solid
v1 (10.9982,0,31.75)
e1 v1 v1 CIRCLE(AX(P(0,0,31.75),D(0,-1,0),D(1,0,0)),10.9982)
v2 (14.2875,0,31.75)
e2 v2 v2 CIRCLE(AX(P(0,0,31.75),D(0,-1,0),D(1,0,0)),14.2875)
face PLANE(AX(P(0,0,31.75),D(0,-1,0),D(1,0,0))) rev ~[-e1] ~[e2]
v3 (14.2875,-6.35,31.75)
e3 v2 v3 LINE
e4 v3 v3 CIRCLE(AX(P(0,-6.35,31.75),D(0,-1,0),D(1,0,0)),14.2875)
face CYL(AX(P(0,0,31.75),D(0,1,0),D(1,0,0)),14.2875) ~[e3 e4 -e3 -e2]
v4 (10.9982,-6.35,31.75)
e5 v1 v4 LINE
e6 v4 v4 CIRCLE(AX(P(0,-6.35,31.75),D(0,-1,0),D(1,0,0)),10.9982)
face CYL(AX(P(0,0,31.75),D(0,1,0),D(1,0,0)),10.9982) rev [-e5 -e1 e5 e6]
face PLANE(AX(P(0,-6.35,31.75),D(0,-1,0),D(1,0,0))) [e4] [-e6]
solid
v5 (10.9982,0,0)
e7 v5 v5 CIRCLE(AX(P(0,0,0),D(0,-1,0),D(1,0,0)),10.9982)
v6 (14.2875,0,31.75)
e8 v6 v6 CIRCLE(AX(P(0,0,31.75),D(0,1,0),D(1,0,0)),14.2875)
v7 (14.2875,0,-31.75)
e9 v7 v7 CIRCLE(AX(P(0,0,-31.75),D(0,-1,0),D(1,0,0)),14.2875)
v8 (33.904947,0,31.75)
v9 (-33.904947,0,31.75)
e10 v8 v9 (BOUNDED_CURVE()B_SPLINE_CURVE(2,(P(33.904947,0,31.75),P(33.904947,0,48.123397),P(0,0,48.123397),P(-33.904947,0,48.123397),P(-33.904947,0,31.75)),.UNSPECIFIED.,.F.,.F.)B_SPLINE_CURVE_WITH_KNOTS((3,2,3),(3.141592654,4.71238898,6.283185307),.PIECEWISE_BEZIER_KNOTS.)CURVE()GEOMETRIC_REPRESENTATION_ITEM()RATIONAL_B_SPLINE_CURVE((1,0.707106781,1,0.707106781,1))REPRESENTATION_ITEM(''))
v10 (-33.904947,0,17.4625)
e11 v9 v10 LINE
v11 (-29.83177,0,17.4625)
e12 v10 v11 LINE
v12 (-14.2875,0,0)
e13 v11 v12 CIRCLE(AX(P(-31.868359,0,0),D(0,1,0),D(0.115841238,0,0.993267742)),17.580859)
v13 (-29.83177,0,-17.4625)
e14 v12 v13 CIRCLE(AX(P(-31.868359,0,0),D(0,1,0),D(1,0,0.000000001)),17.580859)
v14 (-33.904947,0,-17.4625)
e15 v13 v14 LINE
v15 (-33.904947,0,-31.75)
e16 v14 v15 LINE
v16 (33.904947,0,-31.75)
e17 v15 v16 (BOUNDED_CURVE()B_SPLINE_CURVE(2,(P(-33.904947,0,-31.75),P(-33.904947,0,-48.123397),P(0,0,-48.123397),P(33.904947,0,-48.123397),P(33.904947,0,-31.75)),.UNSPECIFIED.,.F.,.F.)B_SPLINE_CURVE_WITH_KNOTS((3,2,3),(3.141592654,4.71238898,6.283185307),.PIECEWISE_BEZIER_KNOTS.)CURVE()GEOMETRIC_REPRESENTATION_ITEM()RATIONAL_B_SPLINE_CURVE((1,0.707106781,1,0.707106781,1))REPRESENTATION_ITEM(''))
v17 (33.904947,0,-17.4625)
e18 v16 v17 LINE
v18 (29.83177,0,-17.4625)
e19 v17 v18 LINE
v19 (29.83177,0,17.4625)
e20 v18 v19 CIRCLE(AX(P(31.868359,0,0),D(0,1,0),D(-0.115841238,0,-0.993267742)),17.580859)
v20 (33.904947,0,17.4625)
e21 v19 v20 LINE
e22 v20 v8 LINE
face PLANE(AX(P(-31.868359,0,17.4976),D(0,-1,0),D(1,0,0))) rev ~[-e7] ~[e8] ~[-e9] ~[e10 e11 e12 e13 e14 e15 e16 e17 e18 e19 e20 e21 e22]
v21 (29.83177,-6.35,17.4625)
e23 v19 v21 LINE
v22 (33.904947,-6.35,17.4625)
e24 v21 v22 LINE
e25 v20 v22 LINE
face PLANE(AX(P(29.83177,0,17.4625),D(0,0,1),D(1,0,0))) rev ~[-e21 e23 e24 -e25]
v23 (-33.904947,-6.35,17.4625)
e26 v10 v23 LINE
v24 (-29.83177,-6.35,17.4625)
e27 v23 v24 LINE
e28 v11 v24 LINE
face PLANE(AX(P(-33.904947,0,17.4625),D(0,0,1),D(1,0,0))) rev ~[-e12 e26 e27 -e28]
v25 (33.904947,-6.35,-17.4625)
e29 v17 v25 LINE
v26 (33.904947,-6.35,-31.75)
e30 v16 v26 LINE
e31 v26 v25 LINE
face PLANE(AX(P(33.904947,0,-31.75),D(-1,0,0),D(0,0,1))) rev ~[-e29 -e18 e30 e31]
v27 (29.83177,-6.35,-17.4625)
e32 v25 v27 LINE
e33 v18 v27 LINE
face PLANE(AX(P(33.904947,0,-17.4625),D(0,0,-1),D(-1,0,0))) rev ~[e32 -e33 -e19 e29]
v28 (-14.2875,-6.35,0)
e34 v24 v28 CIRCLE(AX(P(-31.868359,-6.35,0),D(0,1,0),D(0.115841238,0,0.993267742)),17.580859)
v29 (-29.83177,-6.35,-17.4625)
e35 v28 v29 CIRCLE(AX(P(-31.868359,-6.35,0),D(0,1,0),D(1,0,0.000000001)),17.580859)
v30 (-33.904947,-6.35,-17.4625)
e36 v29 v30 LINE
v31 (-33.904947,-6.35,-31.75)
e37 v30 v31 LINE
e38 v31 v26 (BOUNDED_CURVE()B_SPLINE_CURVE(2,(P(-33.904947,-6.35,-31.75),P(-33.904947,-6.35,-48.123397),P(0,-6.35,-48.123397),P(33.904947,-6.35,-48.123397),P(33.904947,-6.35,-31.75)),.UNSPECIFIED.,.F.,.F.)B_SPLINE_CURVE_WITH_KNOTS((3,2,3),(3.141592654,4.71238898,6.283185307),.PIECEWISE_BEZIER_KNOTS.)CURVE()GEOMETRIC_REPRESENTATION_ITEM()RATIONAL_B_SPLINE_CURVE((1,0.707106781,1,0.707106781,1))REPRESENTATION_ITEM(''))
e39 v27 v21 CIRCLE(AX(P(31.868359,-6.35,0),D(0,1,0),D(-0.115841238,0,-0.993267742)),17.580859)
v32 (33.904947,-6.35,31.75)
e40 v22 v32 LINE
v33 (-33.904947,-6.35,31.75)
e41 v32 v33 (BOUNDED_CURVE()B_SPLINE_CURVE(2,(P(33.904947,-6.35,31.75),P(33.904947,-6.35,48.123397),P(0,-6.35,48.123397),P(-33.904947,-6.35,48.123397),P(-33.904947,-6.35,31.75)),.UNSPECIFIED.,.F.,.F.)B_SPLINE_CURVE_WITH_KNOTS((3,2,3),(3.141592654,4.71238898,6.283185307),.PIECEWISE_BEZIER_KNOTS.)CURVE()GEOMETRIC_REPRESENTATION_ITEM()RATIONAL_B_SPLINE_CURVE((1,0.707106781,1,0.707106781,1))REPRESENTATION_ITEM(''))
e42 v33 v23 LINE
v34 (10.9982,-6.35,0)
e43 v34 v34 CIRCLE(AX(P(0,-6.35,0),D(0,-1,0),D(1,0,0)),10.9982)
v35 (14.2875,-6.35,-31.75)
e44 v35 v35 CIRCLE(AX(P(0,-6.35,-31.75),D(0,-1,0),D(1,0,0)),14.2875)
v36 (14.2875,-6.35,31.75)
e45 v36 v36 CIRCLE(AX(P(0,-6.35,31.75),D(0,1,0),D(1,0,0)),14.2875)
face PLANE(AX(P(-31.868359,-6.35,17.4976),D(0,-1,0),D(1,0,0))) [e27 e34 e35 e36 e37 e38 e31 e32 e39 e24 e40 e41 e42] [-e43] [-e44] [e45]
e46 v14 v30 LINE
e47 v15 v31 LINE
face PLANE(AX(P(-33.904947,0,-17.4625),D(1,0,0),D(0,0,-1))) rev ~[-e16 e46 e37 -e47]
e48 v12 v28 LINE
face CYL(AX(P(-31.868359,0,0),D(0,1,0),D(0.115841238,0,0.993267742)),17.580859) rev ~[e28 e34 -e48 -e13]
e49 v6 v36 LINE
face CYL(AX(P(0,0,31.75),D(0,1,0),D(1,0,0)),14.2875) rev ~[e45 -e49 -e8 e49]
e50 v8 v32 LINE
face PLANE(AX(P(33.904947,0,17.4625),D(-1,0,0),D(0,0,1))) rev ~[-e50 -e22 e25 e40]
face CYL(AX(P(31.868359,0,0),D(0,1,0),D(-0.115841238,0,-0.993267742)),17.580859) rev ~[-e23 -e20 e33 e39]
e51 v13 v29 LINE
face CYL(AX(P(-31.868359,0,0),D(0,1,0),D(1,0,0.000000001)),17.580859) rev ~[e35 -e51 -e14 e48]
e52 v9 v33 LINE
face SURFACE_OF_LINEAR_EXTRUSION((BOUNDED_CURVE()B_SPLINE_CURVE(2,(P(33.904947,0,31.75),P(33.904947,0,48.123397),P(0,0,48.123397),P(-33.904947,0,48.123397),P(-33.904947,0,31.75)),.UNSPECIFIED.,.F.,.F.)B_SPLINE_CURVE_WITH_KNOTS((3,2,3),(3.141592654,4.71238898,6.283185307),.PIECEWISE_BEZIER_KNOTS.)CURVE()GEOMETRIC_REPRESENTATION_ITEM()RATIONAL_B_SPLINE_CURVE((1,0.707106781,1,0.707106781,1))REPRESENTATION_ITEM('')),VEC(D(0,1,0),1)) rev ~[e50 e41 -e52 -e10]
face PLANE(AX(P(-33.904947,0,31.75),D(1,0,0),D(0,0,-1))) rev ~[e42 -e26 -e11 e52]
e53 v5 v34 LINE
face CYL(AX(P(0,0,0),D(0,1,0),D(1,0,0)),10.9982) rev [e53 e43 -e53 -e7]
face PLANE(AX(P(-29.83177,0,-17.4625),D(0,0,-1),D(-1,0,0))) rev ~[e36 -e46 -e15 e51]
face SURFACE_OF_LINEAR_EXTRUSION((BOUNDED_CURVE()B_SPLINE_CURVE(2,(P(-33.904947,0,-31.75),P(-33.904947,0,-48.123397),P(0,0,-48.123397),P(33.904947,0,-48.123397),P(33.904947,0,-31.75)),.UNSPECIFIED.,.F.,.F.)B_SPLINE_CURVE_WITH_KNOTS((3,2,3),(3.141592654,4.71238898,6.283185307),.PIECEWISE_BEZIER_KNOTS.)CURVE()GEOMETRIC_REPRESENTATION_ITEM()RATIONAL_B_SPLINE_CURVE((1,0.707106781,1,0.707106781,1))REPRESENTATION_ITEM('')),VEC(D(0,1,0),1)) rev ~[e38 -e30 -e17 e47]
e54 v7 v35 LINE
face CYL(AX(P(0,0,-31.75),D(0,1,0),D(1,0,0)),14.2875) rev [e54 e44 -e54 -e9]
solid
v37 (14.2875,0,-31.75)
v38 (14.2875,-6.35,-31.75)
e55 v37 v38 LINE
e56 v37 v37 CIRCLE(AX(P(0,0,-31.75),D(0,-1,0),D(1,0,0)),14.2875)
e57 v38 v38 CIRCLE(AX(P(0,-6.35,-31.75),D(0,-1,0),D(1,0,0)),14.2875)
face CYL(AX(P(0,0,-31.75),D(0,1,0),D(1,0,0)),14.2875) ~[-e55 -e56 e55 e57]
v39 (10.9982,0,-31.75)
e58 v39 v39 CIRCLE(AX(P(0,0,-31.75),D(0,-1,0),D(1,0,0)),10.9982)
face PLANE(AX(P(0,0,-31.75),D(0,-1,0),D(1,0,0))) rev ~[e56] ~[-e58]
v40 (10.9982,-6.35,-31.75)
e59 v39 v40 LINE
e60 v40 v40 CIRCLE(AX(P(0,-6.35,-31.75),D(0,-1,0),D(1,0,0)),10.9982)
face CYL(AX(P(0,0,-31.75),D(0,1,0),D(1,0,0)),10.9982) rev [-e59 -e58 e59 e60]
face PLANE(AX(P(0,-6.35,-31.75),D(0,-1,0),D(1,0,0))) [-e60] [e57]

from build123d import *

# Parameters (mm, degrees)
F1_R     = 10.9982
F1_R_2   = 14.2875
F2_DEPTH = 6.35
F0_R     = 14.2875
F0_R_2   = 10.9982


with BuildPart() as f2:
    # F1 (on Front) → F2 (new body)
    with BuildSketch(Plane.XZ):
        with BuildLine():
            Line((-33.9049473405, 17.4625), (-29.8317704118, 17.4625))
            ThreePointArc((-29.8317704118, 17.4625), (-31.8683588761, 17.5808588761), (-33.9049473405, 17.4625))
        make_face()
        with BuildLine():
            ThreePointArc((-33.9049473405, -17.4625), (-31.8683588761, -17.5808588761), (-29.8317704118, -17.4625))
            Line((-29.8317704118, -17.4625), (-33.9049473405, -17.4625))
        make_face()
        with BuildLine():
            ThreePointArc((33.9049473405, 17.4625), (31.8683588761, 17.5808588761), (29.8317704118, 17.4625))
            Line((29.8317704118, 17.4625), (33.9049473405, 17.4625))
        make_face()
        with BuildLine():
            Line((33.9049473405, -17.4625), (29.8317704118, -17.4625))
            ThreePointArc((29.8317704118, -17.4625), (31.8683588761, -17.5808588761), (33.9049473405, -17.4625))
        make_face()
        with BuildLine():
            ThreePointArc((-14.2875, 1.47e-08), (-7.3e-09, -14.2875), (14.2875, 0))
            ThreePointArc((14.2875, 0), (7.3e-09, 14.2875), (-14.2875, 1.47e-08))
        make_face()
        Circle(F1_R, mode=Mode.SUBTRACT)
        with BuildLine():
            ThreePointArc((29.8317704118, -17.4625), (18.7364973706, -11.689346099), (14.2875, 0))
            ThreePointArc((14.2875, 0), (-7.3e-09, -14.2875), (-14.2875, 1.47e-08))
            ThreePointArc((-14.2875, 1.47e-08), (-18.7364973657, -11.6893460935), (-29.8317704118, -17.4625))
            ThreePointArc((-29.8317704118, -17.4625), (-31.8683588761, -17.5808588761), (-33.9049473405, -17.4625))
            Line((-33.9049473405, -17.4625), (-33.9049473405, -31.75))
            add(Edge.make_bspline(
                [(-33.9049473405, -31.75), (-33.9049473405, -48.1233965864), (0, -48.1233965864), (33.9049473405, -48.1233965864), (33.9049473405, -31.75)],
                knots=[3.1415926536, 3.1415926536, 3.1415926536, 4.7123889804, 4.7123889804, 6.2831853072, 6.2831853072, 6.2831853072], degree=2, weights=[1, 0.7071067812, 1, 0.7071067812, 1]))
            Line((33.9049473405, -31.75), (33.9049473405, -17.4625))
            ThreePointArc((33.9049473405, -17.4625), (31.8683588761, -17.5808588761), (29.8317704118, -17.4625))
        make_face()
        with Locations((0, -31.75)):
            Circle(F1_R_2, mode=Mode.SUBTRACT)
        with BuildLine():
            ThreePointArc((-14.2875, 1.47e-08), (7.3e-09, 14.2875), (14.2875, 0))
            ThreePointArc((14.2875, 0), (18.7364973706, 11.689346099), (29.8317704118, 17.4625))
            ThreePointArc((29.8317704118, 17.4625), (31.8683588761, 17.5808588761), (33.9049473405, 17.4625))
            Line((33.9049473405, 17.4625), (33.9049473405, 31.75))
            add(Edge.make_bspline(
                [(33.9049473405, 31.75), (33.9049473405, 48.1233965864), (0, 48.1233965864), (-33.9049473405, 48.1233965864), (-33.9049473405, 31.75)],
                knots=[3.1415926536, 3.1415926536, 3.1415926536, 4.7123889804, 4.7123889804, 6.2831853072, 6.2831853072, 6.2831853072], degree=2, weights=[1, 0.7071067812, 1, 0.7071067812, 1]))
            Line((-33.9049473405, 31.75), (-33.9049473405, 17.4625))
            ThreePointArc((-33.9049473405, 17.4625), (-31.8683588761, 17.5808588761), (-29.8317704118, 17.4625))
            ThreePointArc((-29.8317704118, 17.4625), (-18.7364973754, 11.6893461044), (-14.2875, 1.47e-08))
        make_face()
        with BuildLine():
            ThreePointArc((-14.2875, 31.75), (0, 46.0375), (14.2875, 31.75))
            ThreePointArc((14.2875, 31.75), (0, 17.4625), (-14.2875, 31.75))
        make_face(mode=Mode.SUBTRACT)
    extrude(amount=F2_DEPTH)


with BuildPart() as f2b:
    # F0 (on Front) → F2, piece 2 (new body)
    with BuildSketch(Plane.XZ):
        with Locations((0, 31.75)):
            Circle(F0_R)
        with Locations((0, 31.75)):
            Circle(F0_R_2, mode=Mode.SUBTRACT)
    extrude(amount=F2_DEPTH)


with BuildPart() as f2c:
    # F0 (on Front) → F2, piece 3 (new body)
    with BuildSketch(Plane.XZ):
        with Locations((0, -31.75)):
            Circle(F0_R)
        with Locations((0, -31.75)):
            Circle(F0_R_2, mode=Mode.SUBTRACT)
    extrude(amount=F2_DEPTH)


solid = Compound([f2.part, f2b.part, f2c.part])
